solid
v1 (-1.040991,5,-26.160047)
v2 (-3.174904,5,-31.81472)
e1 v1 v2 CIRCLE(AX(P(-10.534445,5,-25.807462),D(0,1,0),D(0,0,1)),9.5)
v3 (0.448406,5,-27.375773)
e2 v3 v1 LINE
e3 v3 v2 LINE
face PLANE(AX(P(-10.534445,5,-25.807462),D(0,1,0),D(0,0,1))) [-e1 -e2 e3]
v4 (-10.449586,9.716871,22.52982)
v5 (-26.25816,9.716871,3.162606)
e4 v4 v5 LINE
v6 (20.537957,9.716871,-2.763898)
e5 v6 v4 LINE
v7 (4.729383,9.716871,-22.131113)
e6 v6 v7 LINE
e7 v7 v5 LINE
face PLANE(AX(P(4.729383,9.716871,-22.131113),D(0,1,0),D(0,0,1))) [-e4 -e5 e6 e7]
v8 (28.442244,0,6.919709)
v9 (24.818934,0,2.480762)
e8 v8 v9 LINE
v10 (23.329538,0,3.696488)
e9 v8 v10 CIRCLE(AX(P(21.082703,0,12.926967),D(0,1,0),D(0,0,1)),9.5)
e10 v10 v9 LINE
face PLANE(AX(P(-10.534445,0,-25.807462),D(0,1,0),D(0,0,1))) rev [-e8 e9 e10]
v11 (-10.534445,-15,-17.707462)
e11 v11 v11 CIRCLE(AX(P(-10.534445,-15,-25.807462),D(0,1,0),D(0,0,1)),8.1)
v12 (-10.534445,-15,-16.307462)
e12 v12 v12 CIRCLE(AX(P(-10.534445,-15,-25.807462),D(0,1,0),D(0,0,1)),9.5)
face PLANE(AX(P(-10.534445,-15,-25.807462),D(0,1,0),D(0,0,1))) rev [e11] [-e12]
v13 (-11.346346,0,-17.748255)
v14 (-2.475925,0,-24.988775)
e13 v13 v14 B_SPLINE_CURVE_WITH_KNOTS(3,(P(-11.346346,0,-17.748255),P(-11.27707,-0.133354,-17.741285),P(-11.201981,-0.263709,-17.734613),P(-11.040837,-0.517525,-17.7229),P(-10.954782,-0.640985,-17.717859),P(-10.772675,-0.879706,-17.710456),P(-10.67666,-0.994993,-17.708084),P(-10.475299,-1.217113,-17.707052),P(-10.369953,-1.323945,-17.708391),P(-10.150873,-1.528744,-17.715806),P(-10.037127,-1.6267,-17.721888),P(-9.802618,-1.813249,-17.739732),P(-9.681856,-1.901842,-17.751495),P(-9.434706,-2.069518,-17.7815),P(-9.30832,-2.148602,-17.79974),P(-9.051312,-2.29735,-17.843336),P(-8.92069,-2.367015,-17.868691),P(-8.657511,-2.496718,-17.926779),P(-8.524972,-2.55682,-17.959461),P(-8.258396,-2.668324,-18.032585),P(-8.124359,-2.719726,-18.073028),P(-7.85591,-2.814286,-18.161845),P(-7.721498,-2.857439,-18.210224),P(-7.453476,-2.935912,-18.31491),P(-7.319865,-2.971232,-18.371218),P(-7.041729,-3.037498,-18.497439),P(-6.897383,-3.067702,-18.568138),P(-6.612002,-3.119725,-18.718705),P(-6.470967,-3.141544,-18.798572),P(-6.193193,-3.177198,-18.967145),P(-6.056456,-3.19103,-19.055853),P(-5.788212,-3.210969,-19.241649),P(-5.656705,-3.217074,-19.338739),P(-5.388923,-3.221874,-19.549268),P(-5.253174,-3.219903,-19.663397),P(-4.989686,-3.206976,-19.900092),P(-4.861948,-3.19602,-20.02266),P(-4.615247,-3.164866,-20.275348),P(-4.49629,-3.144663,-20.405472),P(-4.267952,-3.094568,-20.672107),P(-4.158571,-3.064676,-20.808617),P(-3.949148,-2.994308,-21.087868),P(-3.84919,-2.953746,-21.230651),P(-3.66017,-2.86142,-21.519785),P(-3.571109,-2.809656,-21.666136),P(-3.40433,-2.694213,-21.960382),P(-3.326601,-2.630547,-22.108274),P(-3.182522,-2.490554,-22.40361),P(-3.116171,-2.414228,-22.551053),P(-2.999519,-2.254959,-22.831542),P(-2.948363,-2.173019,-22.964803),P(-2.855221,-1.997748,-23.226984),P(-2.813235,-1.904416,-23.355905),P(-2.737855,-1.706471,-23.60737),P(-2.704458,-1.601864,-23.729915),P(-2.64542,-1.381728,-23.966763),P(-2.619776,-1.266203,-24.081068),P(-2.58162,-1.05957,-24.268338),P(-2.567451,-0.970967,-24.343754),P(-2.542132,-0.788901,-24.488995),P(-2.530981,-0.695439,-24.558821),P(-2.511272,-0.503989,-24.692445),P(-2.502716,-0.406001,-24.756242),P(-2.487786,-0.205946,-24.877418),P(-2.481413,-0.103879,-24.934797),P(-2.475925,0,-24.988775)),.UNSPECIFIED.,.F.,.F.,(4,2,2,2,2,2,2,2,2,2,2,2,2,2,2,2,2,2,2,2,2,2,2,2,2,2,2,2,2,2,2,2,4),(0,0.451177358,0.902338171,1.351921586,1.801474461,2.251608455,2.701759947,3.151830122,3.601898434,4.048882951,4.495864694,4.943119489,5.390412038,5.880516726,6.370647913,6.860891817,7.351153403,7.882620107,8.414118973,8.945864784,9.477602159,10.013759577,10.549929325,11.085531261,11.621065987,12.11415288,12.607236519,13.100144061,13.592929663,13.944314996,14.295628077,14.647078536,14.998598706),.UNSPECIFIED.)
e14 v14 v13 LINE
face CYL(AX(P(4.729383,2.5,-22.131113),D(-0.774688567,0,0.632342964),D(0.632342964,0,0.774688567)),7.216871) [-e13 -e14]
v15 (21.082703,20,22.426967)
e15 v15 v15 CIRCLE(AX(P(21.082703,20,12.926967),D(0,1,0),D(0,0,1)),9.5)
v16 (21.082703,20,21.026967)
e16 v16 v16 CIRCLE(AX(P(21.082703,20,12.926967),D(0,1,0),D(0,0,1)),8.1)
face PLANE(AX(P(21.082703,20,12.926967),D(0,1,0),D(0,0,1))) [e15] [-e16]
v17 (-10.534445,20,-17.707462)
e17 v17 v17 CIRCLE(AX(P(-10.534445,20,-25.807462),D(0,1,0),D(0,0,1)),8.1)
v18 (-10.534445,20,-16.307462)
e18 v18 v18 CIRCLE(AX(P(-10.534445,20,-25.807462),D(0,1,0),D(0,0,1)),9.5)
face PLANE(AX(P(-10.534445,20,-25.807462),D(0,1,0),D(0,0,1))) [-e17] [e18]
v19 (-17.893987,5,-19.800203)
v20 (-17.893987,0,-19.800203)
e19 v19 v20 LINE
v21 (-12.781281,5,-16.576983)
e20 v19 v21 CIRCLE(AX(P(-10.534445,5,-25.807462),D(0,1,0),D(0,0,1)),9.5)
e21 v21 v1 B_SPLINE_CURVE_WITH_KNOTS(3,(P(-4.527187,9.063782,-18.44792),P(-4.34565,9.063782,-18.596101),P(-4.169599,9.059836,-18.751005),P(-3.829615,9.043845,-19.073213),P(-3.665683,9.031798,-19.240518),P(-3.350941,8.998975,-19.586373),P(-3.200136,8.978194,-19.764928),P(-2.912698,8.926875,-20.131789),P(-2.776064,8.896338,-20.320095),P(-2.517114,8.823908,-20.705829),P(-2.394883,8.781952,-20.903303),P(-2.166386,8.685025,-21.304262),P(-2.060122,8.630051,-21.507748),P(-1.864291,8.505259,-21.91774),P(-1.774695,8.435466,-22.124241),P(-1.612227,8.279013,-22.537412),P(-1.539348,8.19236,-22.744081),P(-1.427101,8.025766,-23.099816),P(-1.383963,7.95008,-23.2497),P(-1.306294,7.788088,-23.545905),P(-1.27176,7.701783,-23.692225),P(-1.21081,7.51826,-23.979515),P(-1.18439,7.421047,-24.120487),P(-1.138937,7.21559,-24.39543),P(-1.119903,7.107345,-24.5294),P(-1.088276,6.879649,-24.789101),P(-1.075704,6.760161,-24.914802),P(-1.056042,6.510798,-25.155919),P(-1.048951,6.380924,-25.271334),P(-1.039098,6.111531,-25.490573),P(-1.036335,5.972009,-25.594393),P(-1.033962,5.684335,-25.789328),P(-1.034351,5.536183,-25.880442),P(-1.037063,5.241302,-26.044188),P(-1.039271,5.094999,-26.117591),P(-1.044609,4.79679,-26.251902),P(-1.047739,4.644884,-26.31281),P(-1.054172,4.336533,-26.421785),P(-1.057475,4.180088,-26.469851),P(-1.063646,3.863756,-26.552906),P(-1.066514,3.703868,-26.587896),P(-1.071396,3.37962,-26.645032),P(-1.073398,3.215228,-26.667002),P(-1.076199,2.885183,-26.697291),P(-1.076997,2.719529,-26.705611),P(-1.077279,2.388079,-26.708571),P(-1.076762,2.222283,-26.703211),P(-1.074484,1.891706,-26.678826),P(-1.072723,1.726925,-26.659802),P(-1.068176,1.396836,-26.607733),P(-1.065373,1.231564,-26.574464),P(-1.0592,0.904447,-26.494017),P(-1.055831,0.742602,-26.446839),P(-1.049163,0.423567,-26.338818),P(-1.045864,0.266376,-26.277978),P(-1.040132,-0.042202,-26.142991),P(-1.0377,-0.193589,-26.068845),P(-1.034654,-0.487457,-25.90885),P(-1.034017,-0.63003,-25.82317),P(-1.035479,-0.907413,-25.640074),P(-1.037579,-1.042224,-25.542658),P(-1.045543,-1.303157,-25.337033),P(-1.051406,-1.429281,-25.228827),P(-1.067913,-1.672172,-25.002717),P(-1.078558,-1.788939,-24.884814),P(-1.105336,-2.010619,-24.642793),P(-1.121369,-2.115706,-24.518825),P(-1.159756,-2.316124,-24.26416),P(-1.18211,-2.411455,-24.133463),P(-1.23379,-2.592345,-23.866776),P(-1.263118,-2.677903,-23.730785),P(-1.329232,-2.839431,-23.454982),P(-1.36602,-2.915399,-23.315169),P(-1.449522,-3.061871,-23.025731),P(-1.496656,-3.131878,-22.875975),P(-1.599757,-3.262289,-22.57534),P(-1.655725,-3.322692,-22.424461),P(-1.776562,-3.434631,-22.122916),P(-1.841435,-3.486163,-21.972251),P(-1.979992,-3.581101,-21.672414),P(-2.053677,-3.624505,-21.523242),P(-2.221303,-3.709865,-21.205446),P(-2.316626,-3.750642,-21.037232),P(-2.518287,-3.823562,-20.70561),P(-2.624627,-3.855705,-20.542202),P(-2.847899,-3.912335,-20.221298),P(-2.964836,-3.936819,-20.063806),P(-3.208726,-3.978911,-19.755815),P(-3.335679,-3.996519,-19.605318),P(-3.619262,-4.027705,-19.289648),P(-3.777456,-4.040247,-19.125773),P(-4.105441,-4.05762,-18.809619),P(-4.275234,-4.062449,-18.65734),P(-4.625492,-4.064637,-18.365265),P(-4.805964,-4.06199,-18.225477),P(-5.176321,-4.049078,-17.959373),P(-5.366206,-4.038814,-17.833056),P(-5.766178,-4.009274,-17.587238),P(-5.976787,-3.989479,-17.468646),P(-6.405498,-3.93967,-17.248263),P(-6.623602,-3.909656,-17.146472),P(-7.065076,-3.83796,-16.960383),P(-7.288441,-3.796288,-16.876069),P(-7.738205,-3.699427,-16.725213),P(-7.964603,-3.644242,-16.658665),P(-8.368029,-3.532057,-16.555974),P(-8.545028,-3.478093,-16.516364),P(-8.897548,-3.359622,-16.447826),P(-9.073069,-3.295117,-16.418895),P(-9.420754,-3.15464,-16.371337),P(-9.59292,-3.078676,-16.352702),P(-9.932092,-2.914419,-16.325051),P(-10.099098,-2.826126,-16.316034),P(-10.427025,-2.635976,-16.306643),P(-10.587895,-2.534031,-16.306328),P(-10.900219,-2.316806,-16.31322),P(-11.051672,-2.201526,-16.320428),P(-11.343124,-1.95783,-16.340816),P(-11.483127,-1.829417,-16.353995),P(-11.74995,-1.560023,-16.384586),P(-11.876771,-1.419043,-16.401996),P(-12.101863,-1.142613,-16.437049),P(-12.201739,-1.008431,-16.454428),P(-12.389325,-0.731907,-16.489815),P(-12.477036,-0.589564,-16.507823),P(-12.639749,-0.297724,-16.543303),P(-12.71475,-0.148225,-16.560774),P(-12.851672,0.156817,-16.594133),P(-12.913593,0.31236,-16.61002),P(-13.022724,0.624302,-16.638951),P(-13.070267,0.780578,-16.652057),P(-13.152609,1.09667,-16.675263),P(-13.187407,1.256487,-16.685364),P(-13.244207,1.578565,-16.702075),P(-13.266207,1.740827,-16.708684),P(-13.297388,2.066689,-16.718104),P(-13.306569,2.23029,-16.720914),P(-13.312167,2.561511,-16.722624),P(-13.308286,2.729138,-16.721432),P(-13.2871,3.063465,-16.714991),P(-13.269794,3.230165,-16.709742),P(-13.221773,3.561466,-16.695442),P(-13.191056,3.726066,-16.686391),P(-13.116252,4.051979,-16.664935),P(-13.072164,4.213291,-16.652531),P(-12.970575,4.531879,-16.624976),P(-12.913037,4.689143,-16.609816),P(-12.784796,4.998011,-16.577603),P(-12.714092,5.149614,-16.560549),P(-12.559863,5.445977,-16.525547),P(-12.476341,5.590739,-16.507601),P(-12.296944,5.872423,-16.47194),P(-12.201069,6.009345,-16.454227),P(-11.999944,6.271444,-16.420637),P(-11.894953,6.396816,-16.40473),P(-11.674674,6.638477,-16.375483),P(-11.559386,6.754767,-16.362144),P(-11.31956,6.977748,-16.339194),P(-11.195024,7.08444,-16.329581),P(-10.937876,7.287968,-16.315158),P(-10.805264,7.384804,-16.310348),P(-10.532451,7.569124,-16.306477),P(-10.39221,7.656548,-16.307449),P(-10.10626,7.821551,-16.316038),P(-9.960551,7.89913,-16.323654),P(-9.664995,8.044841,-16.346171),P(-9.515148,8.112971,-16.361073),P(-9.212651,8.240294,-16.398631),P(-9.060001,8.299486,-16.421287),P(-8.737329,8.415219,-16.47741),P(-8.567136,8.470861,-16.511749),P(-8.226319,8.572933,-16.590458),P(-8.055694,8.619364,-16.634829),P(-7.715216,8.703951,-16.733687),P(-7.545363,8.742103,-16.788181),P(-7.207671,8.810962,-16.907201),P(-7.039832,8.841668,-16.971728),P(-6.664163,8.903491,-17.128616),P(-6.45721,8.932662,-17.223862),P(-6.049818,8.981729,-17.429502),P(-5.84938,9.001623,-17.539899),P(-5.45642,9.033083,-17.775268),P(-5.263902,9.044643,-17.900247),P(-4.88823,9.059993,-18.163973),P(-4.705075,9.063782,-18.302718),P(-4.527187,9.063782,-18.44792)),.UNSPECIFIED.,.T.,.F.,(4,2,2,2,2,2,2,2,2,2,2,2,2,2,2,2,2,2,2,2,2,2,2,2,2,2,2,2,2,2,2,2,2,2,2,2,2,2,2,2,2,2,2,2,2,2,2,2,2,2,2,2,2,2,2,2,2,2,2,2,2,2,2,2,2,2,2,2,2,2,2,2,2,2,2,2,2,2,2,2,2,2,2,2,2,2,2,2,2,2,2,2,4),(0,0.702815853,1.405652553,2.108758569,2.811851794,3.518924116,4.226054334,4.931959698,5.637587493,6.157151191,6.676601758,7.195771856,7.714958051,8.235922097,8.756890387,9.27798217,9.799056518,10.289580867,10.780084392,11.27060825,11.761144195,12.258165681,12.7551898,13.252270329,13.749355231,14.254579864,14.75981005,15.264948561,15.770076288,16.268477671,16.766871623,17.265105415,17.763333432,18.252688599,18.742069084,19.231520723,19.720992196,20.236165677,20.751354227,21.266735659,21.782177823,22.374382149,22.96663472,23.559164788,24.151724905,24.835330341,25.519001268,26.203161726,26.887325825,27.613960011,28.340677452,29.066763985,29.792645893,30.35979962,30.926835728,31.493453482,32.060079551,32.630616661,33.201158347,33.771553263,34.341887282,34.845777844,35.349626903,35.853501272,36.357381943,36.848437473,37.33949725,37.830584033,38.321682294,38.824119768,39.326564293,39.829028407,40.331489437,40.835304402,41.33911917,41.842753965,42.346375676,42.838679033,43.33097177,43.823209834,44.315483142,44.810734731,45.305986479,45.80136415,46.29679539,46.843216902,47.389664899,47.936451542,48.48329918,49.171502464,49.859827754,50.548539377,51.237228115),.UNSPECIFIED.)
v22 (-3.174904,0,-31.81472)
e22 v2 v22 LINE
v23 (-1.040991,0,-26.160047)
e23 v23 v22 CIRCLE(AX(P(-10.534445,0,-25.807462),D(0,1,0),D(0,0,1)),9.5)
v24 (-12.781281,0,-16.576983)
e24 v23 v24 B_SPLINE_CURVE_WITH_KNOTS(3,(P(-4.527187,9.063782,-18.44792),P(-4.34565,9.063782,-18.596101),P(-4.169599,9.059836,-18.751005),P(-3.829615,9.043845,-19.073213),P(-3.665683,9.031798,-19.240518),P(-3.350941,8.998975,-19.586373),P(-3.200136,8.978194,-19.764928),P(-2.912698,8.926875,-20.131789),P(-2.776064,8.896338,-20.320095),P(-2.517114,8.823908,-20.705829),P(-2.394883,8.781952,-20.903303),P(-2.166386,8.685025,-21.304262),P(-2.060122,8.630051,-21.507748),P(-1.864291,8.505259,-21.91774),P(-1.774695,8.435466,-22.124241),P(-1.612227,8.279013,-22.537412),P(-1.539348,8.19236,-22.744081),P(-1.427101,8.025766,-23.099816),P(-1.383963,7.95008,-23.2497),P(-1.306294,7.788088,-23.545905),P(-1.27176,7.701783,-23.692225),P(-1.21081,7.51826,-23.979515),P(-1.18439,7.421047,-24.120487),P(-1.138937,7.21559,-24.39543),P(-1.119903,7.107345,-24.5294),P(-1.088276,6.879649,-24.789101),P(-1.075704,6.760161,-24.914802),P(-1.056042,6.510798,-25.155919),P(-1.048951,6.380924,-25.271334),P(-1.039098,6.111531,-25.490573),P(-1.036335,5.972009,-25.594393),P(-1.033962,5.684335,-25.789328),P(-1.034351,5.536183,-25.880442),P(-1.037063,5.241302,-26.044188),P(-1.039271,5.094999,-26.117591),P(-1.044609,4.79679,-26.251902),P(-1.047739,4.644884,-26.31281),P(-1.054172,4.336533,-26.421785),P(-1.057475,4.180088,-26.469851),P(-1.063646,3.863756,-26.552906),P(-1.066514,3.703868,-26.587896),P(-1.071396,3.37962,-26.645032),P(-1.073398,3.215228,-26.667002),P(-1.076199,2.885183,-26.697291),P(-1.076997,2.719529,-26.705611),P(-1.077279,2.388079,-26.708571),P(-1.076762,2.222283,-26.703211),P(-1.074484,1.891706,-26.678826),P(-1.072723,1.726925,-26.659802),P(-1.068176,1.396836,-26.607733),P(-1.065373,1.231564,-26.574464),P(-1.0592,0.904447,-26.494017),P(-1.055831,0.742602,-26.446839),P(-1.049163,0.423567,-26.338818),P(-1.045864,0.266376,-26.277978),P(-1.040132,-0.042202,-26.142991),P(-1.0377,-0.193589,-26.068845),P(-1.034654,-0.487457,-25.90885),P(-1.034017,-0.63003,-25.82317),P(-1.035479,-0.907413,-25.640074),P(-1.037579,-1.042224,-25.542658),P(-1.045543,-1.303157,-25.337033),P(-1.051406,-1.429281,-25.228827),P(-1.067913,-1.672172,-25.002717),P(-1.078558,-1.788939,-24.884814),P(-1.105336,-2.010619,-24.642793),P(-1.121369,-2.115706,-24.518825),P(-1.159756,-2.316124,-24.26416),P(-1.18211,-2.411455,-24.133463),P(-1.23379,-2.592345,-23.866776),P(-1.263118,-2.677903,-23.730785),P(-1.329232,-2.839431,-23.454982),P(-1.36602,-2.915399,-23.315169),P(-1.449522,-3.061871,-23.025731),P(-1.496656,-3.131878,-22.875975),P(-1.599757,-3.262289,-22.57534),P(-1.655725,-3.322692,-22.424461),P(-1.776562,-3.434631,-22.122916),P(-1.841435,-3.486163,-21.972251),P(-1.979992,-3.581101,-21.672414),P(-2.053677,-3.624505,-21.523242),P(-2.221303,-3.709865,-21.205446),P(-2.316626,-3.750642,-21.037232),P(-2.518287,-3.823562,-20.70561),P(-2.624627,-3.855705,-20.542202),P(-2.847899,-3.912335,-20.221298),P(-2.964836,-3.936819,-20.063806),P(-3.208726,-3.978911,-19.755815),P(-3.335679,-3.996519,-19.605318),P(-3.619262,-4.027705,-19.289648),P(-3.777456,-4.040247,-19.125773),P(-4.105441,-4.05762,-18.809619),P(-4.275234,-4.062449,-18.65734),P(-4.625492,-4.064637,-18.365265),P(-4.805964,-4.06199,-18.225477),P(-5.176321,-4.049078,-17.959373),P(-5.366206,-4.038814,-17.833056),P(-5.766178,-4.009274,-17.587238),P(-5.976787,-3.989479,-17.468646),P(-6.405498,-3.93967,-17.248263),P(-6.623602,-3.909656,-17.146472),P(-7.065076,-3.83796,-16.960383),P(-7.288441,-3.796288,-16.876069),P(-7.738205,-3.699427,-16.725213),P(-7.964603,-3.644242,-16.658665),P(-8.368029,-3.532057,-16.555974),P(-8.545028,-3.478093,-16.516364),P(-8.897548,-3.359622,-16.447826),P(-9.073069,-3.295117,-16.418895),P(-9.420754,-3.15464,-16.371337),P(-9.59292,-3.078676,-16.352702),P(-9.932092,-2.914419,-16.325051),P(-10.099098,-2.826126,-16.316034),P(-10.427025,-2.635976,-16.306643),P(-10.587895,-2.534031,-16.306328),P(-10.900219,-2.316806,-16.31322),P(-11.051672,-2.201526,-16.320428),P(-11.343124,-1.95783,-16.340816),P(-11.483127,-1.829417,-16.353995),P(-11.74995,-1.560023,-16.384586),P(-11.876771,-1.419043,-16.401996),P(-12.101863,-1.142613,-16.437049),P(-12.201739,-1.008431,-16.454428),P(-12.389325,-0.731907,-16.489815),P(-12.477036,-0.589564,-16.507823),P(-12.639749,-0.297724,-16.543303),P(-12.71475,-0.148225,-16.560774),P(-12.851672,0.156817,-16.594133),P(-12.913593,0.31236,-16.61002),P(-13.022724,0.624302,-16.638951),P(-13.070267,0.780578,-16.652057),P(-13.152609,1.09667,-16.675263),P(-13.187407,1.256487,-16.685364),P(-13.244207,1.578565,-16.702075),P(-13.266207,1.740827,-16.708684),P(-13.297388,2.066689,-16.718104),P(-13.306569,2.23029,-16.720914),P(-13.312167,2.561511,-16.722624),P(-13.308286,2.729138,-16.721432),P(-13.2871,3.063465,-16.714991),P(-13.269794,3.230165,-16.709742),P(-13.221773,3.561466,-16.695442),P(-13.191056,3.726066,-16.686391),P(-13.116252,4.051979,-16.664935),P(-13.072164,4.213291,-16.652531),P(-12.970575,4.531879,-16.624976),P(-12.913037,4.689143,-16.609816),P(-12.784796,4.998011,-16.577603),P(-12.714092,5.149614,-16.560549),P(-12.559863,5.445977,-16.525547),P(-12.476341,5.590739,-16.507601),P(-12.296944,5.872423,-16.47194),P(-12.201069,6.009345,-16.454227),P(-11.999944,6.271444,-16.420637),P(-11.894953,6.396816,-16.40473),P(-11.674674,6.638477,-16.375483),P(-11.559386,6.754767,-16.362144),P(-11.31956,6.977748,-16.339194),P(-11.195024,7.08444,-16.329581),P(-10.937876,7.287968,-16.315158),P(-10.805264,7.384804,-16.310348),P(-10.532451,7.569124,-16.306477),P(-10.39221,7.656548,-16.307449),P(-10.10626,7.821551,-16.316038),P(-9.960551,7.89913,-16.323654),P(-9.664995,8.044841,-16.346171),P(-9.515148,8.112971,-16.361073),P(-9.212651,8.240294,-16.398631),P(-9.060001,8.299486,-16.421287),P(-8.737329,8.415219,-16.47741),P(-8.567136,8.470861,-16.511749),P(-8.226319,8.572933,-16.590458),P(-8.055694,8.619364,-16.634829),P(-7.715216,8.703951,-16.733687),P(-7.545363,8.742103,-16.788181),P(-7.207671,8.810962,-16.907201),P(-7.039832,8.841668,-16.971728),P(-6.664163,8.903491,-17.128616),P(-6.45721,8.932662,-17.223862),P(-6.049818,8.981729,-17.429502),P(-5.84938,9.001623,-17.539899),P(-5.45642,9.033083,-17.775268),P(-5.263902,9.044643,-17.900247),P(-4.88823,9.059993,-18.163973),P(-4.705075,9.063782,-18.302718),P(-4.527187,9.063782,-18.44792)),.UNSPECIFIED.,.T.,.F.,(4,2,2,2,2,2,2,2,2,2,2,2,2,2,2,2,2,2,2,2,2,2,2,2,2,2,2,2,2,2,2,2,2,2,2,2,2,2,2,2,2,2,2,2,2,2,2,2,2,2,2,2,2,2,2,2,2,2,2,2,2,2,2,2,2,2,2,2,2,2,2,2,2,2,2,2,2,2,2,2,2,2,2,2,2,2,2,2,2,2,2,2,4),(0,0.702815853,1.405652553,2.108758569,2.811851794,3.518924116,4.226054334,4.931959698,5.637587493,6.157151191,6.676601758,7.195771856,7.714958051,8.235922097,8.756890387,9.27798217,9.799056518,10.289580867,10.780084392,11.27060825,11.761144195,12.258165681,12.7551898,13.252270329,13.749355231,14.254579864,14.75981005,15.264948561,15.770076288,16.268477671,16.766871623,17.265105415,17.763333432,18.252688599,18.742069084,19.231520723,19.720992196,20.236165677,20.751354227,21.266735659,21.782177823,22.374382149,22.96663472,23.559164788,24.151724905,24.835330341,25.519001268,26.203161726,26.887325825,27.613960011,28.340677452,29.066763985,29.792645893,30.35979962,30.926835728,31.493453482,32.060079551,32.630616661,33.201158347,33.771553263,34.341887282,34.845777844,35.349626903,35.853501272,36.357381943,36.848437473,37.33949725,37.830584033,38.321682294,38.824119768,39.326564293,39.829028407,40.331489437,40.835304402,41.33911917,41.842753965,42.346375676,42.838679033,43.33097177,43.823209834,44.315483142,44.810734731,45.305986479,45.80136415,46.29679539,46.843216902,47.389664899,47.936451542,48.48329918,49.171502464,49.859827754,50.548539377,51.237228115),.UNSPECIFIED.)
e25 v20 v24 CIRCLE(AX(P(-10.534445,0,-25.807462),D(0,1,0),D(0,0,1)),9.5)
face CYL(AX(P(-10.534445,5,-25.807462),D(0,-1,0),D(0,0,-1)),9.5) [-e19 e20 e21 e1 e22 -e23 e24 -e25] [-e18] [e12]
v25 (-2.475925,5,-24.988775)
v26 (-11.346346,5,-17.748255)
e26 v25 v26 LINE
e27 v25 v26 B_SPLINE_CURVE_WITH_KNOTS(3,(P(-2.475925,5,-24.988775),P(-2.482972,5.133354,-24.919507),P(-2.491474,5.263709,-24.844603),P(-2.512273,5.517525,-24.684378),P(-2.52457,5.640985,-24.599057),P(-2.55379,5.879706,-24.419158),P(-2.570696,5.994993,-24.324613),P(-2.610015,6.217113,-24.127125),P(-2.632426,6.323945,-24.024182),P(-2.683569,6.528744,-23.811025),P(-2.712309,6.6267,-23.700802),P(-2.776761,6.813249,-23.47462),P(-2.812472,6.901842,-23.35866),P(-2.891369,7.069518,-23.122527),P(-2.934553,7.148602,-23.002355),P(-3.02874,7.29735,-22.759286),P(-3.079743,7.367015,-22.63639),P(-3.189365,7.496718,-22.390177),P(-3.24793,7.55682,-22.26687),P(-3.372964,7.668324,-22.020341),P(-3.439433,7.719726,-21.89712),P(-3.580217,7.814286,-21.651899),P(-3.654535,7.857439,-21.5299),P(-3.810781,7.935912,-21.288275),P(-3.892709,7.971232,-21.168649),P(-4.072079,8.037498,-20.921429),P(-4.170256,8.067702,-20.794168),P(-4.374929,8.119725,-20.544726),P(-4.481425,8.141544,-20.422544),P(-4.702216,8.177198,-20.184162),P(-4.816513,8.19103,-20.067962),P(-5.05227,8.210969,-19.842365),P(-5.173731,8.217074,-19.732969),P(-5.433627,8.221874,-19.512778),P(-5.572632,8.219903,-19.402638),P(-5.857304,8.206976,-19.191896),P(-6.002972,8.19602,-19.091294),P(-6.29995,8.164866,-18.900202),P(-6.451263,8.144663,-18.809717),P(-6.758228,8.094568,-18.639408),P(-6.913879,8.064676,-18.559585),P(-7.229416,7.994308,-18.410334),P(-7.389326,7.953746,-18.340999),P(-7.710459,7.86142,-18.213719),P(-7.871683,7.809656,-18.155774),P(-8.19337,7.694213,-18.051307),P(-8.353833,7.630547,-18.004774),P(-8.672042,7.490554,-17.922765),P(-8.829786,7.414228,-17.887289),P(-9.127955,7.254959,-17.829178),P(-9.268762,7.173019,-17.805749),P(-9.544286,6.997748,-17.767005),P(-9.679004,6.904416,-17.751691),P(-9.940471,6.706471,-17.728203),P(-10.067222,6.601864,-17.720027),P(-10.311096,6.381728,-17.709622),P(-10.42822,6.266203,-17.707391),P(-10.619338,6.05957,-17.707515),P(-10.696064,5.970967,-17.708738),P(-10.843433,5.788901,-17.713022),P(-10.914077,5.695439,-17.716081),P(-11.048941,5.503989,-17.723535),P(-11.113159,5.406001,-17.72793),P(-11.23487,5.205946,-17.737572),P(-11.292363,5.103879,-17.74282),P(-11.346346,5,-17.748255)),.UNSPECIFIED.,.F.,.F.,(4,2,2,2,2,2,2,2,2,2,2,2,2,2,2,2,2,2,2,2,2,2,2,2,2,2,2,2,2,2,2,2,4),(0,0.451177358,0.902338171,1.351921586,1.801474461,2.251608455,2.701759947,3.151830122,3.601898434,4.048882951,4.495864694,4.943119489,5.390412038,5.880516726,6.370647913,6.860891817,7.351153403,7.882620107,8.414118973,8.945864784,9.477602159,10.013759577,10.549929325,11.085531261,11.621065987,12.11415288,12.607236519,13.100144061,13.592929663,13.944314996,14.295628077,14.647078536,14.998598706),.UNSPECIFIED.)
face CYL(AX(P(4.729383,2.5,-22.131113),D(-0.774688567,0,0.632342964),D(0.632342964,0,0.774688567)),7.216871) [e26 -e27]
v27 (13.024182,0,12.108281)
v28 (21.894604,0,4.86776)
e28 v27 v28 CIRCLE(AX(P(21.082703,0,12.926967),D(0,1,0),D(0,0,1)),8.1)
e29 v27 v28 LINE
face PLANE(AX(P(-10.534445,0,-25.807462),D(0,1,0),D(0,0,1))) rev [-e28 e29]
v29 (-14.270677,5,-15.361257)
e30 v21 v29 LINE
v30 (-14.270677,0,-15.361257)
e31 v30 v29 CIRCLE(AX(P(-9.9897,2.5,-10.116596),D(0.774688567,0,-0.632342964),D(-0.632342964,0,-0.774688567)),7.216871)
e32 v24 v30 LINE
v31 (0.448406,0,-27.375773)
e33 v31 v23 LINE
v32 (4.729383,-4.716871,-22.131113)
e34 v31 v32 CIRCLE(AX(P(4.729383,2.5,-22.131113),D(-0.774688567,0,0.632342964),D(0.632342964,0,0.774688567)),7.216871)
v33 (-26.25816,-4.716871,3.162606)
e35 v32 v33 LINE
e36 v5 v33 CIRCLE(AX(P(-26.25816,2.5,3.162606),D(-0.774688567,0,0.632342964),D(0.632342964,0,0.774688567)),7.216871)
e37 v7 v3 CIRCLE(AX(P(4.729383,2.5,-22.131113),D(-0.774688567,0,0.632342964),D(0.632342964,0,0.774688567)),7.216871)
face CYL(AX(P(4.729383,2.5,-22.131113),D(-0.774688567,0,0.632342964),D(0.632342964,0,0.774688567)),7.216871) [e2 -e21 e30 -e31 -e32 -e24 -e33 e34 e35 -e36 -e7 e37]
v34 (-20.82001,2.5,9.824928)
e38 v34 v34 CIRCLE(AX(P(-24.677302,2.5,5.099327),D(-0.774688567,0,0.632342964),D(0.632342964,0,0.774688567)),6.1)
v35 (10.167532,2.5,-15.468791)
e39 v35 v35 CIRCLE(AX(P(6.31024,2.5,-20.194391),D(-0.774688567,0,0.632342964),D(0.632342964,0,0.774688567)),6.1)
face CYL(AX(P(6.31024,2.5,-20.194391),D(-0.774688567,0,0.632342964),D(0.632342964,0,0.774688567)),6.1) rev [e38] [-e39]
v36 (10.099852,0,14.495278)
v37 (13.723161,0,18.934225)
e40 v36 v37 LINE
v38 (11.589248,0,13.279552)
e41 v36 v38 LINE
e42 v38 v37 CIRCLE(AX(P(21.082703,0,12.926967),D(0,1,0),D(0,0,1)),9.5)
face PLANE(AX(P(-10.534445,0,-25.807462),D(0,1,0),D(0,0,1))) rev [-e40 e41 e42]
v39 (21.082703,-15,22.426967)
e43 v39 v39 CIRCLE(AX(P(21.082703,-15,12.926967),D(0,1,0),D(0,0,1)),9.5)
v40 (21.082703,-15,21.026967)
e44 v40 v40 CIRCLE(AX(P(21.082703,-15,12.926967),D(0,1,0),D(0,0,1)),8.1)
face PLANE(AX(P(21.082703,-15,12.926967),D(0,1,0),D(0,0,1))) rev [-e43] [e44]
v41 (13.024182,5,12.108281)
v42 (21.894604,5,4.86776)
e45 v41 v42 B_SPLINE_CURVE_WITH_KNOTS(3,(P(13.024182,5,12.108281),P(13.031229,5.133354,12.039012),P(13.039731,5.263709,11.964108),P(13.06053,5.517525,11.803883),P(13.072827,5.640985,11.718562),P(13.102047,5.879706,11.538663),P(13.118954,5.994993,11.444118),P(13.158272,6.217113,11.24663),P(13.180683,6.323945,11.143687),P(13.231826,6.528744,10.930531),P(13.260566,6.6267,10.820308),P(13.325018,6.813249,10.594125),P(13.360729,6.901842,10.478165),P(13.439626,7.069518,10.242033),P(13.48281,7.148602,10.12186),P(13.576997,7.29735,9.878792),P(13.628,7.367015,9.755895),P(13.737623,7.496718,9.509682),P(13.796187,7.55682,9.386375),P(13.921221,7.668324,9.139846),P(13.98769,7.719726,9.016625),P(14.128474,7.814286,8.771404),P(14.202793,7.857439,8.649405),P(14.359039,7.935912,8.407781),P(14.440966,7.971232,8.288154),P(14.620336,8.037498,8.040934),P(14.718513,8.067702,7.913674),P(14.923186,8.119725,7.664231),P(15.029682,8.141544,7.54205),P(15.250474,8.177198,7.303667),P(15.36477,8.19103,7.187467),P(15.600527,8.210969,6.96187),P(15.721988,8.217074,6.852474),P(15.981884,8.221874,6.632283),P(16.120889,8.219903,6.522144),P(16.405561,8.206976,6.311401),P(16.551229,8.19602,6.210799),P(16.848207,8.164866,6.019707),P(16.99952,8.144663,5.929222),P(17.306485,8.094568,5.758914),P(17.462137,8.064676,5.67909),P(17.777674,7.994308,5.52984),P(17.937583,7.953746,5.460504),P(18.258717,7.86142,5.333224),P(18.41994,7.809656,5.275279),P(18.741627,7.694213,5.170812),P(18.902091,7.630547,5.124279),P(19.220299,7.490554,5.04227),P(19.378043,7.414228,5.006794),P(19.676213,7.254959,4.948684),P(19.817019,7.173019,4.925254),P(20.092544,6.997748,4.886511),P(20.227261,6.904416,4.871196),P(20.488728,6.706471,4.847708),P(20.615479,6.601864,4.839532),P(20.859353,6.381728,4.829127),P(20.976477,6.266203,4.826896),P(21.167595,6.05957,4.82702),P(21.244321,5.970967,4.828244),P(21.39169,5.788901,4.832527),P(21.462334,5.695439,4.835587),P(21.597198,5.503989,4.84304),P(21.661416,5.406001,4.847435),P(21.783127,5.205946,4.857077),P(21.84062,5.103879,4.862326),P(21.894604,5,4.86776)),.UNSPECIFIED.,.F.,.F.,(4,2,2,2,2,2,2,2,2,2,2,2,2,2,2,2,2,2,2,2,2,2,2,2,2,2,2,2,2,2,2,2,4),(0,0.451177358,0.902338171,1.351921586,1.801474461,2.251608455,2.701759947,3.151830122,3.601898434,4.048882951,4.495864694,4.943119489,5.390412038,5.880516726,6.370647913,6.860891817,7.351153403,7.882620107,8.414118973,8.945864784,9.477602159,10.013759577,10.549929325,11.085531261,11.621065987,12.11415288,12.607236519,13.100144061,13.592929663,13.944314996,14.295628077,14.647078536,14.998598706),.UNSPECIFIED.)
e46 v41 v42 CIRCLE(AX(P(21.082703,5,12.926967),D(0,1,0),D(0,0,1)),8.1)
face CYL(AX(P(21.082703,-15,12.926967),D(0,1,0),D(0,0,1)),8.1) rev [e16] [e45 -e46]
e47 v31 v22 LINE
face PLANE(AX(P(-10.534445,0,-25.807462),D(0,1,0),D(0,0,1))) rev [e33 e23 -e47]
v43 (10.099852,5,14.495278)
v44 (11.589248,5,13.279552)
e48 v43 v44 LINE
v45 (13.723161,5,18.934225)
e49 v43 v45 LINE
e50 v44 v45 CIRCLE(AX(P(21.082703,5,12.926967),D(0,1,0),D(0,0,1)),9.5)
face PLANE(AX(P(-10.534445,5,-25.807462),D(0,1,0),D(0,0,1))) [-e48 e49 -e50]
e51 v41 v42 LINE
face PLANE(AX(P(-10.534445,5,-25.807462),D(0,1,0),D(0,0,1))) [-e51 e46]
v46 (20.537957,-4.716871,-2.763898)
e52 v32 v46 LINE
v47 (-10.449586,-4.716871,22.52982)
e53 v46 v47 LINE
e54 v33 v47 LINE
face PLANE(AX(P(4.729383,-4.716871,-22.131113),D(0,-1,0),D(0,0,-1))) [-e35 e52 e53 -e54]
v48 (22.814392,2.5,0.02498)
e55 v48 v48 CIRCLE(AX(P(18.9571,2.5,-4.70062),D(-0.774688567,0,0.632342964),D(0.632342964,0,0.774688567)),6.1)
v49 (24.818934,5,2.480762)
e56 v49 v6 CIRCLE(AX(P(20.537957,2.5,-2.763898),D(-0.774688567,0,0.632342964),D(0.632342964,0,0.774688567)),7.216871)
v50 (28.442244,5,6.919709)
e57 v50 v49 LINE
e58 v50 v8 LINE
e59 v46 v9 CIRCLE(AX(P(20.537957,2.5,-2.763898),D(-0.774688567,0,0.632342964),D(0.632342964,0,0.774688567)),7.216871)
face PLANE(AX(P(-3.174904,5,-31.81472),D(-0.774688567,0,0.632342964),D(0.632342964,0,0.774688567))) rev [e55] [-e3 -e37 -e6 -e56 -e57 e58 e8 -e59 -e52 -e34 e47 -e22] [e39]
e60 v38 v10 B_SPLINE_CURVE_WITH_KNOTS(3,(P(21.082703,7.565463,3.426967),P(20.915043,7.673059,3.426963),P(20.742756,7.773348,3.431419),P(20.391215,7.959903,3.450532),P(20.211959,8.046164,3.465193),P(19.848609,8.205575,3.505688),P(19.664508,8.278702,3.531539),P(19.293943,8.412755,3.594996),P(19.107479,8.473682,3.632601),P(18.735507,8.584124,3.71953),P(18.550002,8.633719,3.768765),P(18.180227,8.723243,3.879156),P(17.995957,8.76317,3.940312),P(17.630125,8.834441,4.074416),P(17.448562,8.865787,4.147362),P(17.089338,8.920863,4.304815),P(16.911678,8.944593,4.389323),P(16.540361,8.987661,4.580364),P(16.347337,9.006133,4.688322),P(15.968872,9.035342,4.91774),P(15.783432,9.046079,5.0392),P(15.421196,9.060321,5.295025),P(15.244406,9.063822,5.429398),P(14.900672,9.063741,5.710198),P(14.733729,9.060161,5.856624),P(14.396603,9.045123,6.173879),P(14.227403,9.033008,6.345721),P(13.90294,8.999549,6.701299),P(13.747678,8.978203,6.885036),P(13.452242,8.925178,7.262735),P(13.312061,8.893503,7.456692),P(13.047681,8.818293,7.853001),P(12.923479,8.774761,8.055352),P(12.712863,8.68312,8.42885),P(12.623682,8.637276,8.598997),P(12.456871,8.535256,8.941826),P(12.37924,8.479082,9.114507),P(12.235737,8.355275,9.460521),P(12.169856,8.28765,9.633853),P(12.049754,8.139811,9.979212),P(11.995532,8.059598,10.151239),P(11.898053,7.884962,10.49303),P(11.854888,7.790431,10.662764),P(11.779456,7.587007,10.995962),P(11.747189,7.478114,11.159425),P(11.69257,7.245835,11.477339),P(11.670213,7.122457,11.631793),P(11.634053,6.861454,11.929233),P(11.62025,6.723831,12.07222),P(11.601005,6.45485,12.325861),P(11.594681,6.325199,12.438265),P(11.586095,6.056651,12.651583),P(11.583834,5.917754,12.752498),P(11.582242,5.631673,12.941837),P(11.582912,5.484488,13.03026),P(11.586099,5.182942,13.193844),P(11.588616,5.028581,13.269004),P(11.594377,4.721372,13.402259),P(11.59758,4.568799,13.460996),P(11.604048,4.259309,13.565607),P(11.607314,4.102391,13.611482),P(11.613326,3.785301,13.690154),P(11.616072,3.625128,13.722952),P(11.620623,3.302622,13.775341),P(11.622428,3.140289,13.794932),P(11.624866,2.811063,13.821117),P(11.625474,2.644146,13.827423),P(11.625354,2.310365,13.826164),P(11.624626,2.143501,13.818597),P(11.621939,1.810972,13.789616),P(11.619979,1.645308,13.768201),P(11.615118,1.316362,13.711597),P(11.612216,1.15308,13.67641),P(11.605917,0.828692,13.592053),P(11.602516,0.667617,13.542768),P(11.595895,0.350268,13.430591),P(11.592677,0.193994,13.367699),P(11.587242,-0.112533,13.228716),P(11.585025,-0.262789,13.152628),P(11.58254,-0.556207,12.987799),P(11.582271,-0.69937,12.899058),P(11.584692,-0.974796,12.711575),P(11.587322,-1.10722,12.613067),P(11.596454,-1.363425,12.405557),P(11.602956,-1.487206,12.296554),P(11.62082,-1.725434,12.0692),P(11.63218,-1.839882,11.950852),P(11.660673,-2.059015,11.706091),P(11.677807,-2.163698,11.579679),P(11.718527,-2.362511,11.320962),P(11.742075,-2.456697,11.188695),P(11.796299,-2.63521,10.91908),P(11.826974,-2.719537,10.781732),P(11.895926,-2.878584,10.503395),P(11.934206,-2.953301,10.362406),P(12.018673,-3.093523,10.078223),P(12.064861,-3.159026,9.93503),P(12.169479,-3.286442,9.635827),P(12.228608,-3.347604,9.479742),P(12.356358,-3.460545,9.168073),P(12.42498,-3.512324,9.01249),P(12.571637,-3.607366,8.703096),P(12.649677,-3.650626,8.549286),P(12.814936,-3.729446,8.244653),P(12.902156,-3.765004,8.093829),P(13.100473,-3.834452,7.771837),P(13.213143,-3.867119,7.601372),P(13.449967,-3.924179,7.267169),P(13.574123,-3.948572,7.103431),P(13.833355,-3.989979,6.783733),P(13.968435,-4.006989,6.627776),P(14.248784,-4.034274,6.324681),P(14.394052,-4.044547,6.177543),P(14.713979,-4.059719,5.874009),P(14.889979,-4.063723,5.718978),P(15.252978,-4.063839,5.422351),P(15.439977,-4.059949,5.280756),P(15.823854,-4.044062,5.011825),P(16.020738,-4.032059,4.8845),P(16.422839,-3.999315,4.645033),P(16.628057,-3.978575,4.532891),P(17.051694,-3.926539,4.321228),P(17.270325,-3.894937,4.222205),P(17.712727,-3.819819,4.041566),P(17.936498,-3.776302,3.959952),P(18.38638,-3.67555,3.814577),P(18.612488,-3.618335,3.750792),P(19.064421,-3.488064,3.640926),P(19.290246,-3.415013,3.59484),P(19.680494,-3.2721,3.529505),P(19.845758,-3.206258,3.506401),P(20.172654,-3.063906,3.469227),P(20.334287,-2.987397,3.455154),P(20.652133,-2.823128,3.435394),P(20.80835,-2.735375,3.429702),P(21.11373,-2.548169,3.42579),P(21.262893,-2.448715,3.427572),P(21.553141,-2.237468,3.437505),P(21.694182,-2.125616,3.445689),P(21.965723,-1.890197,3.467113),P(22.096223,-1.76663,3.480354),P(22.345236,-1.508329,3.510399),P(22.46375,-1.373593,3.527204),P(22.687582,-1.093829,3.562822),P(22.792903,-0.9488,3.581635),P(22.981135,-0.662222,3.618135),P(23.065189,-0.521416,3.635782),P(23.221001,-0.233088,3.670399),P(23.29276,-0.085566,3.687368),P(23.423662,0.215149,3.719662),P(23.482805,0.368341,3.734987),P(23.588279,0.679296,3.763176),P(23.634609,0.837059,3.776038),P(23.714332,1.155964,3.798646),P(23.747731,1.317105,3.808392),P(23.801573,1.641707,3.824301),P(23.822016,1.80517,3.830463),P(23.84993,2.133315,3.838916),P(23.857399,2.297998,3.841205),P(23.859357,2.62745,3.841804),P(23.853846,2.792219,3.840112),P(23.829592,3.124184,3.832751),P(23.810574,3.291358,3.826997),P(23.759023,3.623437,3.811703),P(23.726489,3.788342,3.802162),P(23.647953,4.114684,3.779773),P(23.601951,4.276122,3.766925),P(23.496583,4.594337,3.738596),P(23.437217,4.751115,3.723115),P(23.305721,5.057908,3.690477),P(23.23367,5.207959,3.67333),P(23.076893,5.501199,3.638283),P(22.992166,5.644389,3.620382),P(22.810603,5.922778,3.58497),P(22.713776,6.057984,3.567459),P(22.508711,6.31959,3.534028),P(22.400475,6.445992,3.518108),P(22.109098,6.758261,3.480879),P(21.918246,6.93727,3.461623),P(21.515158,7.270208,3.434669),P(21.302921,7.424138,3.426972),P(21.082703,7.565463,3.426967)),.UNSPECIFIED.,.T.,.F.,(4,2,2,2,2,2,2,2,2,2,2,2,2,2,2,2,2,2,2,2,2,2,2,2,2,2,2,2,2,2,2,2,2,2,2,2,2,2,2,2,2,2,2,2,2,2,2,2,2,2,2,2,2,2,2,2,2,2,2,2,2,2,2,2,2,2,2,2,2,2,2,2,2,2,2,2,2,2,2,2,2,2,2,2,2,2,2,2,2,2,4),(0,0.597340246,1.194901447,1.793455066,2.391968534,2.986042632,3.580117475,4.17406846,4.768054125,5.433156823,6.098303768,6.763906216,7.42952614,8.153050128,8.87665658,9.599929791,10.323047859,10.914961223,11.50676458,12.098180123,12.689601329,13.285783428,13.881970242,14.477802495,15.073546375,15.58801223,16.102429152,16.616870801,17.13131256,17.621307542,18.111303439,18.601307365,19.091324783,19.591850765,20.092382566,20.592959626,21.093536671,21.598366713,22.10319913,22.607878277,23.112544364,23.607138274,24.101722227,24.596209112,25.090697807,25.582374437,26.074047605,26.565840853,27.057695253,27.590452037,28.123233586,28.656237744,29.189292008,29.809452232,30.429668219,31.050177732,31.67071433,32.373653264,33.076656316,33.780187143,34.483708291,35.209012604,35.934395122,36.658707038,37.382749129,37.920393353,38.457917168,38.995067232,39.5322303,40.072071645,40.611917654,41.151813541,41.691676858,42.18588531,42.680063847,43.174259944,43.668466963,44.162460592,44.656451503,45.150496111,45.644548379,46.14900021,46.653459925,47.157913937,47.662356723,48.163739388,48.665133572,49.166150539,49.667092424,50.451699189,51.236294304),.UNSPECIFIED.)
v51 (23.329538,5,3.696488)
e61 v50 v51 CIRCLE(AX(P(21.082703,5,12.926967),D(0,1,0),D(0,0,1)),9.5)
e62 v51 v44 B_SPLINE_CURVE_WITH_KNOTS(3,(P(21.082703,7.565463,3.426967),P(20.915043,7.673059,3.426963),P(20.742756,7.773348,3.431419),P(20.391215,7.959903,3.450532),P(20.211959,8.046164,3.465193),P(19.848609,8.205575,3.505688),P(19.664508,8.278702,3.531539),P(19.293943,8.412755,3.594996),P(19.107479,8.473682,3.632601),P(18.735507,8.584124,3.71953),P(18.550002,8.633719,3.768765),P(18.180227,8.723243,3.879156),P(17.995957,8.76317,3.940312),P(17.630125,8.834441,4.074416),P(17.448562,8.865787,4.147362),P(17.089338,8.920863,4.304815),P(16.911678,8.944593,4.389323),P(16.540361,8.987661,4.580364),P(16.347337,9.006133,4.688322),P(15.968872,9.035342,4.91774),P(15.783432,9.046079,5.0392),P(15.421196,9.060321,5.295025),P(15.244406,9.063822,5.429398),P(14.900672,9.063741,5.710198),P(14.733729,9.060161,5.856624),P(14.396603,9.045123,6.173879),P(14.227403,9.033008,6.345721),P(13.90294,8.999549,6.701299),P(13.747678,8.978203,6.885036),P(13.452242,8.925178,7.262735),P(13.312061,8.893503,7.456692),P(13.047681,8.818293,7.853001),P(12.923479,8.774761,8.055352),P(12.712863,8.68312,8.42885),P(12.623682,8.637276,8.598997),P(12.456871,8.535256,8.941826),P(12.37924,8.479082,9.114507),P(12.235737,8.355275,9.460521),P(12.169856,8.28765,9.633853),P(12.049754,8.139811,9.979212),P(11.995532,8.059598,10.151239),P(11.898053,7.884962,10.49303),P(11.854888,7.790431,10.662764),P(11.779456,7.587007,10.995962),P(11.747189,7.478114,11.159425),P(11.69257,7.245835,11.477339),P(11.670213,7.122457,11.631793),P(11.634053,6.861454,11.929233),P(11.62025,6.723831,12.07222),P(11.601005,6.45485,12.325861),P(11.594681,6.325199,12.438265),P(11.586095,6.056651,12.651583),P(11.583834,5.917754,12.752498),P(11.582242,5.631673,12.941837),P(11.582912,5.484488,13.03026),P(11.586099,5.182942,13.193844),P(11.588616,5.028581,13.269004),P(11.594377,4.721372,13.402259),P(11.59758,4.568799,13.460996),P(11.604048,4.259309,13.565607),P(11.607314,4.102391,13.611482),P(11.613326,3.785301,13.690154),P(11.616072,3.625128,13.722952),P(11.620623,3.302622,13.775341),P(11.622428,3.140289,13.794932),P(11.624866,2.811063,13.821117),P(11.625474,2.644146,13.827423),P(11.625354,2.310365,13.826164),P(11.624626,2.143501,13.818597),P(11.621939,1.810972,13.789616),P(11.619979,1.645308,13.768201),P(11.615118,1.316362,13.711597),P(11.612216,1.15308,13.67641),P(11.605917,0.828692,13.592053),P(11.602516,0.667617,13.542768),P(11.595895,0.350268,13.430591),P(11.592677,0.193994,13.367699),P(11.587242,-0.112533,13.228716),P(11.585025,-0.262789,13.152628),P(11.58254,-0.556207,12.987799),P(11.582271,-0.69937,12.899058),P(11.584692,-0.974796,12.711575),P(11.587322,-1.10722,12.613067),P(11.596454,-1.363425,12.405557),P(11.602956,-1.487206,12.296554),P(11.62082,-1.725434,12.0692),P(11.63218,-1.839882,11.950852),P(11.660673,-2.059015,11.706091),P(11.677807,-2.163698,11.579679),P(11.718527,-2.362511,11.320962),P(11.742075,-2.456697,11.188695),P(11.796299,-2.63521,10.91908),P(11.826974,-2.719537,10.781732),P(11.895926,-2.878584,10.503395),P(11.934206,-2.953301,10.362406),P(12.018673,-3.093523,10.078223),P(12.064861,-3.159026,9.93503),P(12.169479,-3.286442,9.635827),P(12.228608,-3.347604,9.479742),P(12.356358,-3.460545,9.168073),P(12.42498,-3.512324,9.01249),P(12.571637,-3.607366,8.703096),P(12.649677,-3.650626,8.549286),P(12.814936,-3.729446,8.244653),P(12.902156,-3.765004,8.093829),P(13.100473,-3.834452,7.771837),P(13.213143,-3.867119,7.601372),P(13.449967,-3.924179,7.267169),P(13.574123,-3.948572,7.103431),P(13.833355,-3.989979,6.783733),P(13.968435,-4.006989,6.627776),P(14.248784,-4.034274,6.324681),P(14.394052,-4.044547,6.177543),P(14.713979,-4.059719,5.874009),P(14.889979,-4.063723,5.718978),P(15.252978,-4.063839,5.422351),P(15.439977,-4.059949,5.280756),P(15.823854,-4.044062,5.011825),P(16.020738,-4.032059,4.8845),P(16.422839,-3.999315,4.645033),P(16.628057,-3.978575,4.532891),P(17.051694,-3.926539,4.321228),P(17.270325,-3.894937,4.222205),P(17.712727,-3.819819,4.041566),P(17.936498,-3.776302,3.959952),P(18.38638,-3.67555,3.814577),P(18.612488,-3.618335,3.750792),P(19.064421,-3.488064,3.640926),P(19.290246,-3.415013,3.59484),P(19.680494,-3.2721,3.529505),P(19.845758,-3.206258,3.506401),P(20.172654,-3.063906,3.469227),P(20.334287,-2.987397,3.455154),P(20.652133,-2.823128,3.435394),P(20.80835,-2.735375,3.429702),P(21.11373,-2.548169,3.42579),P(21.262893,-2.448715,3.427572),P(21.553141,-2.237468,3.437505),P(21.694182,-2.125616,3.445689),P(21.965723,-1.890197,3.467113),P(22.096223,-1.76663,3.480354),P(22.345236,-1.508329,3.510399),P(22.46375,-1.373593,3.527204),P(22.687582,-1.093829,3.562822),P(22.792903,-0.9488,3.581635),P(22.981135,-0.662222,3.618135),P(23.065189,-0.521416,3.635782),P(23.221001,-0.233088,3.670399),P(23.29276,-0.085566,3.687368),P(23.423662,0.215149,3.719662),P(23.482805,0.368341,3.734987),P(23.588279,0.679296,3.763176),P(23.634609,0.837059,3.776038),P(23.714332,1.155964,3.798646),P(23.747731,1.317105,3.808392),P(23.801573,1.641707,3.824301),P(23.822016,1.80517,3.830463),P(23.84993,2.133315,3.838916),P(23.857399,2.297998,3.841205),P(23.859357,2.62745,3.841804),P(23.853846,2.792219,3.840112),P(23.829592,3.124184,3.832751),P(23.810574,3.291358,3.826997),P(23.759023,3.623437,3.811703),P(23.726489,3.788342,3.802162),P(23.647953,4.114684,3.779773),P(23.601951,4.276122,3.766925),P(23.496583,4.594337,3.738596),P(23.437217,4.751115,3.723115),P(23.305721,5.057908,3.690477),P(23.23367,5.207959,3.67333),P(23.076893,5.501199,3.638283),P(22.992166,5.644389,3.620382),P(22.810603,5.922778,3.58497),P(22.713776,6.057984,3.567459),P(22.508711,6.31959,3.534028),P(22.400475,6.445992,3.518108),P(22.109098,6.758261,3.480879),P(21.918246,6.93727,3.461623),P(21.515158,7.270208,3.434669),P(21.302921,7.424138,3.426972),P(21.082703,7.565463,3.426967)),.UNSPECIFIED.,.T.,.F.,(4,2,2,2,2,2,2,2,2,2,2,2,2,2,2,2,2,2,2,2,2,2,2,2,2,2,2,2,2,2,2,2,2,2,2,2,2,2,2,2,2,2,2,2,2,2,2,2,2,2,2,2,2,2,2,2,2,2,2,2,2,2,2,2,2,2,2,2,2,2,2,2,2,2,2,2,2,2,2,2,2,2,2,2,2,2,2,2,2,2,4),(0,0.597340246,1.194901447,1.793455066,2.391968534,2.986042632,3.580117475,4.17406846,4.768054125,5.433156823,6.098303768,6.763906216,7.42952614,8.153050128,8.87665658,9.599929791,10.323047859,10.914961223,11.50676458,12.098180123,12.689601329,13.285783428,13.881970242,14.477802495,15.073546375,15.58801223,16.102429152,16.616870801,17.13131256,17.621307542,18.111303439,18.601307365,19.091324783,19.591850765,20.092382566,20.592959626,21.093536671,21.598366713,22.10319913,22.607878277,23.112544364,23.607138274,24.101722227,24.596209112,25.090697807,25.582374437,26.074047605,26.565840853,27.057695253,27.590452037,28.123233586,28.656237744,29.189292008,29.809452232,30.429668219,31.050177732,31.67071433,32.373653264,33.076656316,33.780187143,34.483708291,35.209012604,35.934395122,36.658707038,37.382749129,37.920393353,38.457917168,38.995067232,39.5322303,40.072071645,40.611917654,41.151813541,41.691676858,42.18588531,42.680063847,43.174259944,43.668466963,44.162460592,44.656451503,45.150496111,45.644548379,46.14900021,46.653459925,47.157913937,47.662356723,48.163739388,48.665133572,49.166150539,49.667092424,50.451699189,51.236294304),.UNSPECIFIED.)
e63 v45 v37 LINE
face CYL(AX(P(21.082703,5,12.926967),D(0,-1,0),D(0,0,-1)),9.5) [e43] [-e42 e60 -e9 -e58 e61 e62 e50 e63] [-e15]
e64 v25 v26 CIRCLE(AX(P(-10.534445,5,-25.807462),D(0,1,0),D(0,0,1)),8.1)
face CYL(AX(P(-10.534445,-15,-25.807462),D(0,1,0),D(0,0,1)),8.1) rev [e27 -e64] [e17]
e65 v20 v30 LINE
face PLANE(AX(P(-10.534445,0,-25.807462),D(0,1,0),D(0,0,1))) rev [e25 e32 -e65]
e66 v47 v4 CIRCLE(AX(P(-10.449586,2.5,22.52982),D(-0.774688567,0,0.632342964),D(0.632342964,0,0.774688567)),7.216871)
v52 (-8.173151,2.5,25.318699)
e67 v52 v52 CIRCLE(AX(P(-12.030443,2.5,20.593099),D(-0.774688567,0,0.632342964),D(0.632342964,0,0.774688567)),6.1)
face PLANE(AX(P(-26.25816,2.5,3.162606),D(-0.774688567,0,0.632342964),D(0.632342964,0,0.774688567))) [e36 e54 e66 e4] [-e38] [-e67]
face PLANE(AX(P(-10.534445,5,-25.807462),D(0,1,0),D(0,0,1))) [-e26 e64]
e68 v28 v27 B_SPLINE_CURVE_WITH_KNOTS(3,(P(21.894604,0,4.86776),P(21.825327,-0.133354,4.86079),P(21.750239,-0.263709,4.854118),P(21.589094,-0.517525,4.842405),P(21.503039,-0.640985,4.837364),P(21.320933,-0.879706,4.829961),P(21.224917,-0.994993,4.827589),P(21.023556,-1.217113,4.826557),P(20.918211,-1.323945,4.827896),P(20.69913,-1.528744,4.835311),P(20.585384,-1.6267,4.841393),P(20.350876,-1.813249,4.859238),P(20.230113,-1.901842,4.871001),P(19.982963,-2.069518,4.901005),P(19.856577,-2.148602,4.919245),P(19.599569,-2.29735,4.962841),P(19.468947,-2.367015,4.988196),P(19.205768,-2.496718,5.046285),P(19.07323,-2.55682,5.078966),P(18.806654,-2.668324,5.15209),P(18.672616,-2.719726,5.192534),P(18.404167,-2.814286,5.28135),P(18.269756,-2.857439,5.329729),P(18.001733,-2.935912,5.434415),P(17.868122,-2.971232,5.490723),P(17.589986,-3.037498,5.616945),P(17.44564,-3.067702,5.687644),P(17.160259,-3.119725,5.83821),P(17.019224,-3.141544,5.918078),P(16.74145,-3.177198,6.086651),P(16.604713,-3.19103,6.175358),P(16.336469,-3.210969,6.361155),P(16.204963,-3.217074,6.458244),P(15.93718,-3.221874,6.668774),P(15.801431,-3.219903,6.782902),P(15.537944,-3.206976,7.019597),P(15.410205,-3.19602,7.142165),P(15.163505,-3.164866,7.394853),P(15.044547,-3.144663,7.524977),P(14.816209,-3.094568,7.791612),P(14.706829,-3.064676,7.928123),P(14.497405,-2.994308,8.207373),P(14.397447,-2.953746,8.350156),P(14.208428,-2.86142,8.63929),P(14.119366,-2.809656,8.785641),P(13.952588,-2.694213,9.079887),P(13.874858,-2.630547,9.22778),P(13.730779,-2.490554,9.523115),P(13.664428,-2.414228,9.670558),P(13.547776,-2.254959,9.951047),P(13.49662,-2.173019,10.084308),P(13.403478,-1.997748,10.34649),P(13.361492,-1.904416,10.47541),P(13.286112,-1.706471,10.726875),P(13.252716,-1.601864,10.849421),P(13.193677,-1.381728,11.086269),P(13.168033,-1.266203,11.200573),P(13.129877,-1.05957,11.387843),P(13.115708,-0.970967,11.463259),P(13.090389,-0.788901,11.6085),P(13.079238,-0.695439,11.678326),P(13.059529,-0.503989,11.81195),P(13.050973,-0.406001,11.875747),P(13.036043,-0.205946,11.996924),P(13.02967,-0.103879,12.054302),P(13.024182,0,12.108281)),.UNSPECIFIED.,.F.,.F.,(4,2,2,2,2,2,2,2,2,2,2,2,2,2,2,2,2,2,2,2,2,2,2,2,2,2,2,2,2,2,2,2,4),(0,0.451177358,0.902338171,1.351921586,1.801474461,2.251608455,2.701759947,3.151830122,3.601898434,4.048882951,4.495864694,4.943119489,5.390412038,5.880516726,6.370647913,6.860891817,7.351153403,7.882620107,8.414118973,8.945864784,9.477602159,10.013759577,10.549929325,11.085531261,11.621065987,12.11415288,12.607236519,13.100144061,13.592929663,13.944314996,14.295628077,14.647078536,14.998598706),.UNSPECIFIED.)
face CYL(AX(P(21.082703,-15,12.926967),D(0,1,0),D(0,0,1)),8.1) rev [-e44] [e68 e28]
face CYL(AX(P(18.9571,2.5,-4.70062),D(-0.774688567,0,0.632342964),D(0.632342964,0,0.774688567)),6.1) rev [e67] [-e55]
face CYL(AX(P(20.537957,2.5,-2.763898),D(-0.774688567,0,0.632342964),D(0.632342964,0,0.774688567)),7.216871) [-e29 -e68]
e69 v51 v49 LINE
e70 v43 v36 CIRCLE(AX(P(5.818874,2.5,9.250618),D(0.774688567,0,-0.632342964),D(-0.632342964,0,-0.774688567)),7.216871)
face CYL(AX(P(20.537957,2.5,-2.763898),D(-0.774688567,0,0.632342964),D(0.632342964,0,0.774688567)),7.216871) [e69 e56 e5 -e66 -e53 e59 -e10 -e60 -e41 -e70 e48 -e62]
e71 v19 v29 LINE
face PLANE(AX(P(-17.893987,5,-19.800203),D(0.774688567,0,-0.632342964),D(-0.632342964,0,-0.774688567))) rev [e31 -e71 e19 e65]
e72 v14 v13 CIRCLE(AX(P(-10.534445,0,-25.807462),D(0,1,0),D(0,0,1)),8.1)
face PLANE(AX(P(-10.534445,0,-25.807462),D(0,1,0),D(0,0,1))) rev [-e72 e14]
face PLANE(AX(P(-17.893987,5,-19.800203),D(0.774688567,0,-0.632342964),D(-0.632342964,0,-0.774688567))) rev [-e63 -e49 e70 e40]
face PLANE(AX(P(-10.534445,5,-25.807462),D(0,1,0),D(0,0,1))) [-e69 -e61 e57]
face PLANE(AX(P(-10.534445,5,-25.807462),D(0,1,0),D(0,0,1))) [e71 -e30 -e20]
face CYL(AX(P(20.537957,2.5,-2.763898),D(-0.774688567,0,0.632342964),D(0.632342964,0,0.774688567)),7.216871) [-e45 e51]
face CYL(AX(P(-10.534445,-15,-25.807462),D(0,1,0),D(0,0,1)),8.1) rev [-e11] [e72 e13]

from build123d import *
from build123d.topology import SkipClean

# Parameters (mm, degrees)
BOSS_EXTRUDE2_DEPTH      = 5
BOSS_EXTRUDE3_DEPTH      = 15
BOSS_EXTRUDE3_DEPTH_BACK = 20
SKETCH4_R                = 9.5
SKETCH4_R_2              = 8.1
BOSS_EXTRUDE4_DEPTH      = 21
BOSS_EXTRUDE4_DEPTH_BACK = 19
SKETCH5_R                = 6.1
CUT_EXTRUDE2_START       = -41
SKETCH6_R                = 6.1
CUT_EXTRUDE2_DEPTH       = 41


with BuildPart() as part:
    # Sketch3 → Boss-Extrude2 (new body)
    with BuildSketch(Plane(origin=(0, 0, 0), x_dir=(1, 0, 0), z_dir=(0, 1, 0))):
        with BuildLine():
            Line((-3.174904091, 31.814719718), (28.442244127, -6.919708618))
            ThreePointArc((28.442244127, -6.919708618), (27.089960905, -20.286508163), (13.723161359, -18.934224941))
            Line((13.723161359, -18.934224941), (-17.893986859, 19.800203396))
            ThreePointArc((-17.893986859, 19.800203396), (-16.541703636, 33.167002941), (-3.174904091, 31.814719718))
        make_face()
    extrude(amount=BOSS_EXTRUDE2_DEPTH)

    # Sketch4 → Boss-Extrude3 (add, two sides: drawn at the far end of the back side and taken through both)
    # profile 1 of 2: a face of its own
    with SkipClean():  # the faces are left unmerged after this step: merging them gives an invalid solid
        with BuildSketch(Plane(origin=(0, 5, 0), x_dir=(1, 0, 0), z_dir=(0, 1, 0)).offset(-BOSS_EXTRUDE3_DEPTH_BACK)):
            with Locations((-10.534445475, 25.807461557)):
                Circle(SKETCH4_R)
            with Locations((-10.534445475, 25.807461557)):
                Circle(SKETCH4_R_2, mode=Mode.SUBTRACT)
        # profile 2 of 2: a face of its own
        with BuildSketch(Plane(origin=(0, 5, 0), x_dir=(1, 0, 0), z_dir=(0, 1, 0)).offset(-BOSS_EXTRUDE3_DEPTH_BACK)):
            with Locations((21.082702743, -12.92696678)):
                Circle(SKETCH4_R)
            with Locations((21.082702743, -12.92696678)):
                Circle(SKETCH4_R_2, mode=Mode.SUBTRACT)
        extrude(amount=BOSS_EXTRUDE3_DEPTH + BOSS_EXTRUDE3_DEPTH_BACK)

    # Sketch5 → Boss-Extrude4 (add, two sides: drawn at the far end of the back side and taken through both)
    with SkipClean():  # the faces are left unmerged after this step: merging them gives an invalid solid
        with BuildSketch(Plane(origin=(-1.03943662, 0, 0.848444732), x_dir=(0.6323429643622943, 0, 0.774688566729564), z_dir=(-0.774688566729564, 0, 0.6323429643622943)).offset(-BOSS_EXTRUDE4_DEPTH_BACK)):
            with BuildLine():
                Line((-14.154127884, 9.71687123), (10.845872116, 9.71687123))
                ThreePointArc((10.845872116, 9.71687123), (18.062743346, 2.5), (10.845872116, -4.71687123))
                Line((10.845872116, -4.71687123), (-14.154127884, -4.71687123))
                ThreePointArc((-14.154127884, -4.71687123), (-21.370999114, 2.5), (-14.154127884, 9.71687123))
            make_face()
            with Locations((-11.654127884, 2.5)):
                Circle(SKETCH5_R, mode=Mode.SUBTRACT)
            with Locations((8.345872116, 2.5)):
                Circle(SKETCH5_R, mode=Mode.SUBTRACT)
        extrude(amount=BOSS_EXTRUDE4_DEPTH + BOSS_EXTRUDE4_DEPTH_BACK)

    # Sketch6 → Cut-Extrude2 (cut)
    with SkipClean():  # the faces are left unmerged after this step: merging them gives an invalid solid
        with BuildSketch(Plane(origin=(-17.307896522, 0, 14.127646984), x_dir=(0.6323429643622943, 0, 0.774688566729564), z_dir=(-0.774688566729564, 0, 0.6323429643622943)).offset(CUT_EXTRUDE2_START)):
            with Locations((-11.654127884, 2.5)):
                Circle(SKETCH6_R)
            with Locations((8.345872116, 2.5)):
                Circle(SKETCH6_R)
        extrude(amount=CUT_EXTRUDE2_DEPTH, mode=Mode.SUBTRACT)


solid = part.part
